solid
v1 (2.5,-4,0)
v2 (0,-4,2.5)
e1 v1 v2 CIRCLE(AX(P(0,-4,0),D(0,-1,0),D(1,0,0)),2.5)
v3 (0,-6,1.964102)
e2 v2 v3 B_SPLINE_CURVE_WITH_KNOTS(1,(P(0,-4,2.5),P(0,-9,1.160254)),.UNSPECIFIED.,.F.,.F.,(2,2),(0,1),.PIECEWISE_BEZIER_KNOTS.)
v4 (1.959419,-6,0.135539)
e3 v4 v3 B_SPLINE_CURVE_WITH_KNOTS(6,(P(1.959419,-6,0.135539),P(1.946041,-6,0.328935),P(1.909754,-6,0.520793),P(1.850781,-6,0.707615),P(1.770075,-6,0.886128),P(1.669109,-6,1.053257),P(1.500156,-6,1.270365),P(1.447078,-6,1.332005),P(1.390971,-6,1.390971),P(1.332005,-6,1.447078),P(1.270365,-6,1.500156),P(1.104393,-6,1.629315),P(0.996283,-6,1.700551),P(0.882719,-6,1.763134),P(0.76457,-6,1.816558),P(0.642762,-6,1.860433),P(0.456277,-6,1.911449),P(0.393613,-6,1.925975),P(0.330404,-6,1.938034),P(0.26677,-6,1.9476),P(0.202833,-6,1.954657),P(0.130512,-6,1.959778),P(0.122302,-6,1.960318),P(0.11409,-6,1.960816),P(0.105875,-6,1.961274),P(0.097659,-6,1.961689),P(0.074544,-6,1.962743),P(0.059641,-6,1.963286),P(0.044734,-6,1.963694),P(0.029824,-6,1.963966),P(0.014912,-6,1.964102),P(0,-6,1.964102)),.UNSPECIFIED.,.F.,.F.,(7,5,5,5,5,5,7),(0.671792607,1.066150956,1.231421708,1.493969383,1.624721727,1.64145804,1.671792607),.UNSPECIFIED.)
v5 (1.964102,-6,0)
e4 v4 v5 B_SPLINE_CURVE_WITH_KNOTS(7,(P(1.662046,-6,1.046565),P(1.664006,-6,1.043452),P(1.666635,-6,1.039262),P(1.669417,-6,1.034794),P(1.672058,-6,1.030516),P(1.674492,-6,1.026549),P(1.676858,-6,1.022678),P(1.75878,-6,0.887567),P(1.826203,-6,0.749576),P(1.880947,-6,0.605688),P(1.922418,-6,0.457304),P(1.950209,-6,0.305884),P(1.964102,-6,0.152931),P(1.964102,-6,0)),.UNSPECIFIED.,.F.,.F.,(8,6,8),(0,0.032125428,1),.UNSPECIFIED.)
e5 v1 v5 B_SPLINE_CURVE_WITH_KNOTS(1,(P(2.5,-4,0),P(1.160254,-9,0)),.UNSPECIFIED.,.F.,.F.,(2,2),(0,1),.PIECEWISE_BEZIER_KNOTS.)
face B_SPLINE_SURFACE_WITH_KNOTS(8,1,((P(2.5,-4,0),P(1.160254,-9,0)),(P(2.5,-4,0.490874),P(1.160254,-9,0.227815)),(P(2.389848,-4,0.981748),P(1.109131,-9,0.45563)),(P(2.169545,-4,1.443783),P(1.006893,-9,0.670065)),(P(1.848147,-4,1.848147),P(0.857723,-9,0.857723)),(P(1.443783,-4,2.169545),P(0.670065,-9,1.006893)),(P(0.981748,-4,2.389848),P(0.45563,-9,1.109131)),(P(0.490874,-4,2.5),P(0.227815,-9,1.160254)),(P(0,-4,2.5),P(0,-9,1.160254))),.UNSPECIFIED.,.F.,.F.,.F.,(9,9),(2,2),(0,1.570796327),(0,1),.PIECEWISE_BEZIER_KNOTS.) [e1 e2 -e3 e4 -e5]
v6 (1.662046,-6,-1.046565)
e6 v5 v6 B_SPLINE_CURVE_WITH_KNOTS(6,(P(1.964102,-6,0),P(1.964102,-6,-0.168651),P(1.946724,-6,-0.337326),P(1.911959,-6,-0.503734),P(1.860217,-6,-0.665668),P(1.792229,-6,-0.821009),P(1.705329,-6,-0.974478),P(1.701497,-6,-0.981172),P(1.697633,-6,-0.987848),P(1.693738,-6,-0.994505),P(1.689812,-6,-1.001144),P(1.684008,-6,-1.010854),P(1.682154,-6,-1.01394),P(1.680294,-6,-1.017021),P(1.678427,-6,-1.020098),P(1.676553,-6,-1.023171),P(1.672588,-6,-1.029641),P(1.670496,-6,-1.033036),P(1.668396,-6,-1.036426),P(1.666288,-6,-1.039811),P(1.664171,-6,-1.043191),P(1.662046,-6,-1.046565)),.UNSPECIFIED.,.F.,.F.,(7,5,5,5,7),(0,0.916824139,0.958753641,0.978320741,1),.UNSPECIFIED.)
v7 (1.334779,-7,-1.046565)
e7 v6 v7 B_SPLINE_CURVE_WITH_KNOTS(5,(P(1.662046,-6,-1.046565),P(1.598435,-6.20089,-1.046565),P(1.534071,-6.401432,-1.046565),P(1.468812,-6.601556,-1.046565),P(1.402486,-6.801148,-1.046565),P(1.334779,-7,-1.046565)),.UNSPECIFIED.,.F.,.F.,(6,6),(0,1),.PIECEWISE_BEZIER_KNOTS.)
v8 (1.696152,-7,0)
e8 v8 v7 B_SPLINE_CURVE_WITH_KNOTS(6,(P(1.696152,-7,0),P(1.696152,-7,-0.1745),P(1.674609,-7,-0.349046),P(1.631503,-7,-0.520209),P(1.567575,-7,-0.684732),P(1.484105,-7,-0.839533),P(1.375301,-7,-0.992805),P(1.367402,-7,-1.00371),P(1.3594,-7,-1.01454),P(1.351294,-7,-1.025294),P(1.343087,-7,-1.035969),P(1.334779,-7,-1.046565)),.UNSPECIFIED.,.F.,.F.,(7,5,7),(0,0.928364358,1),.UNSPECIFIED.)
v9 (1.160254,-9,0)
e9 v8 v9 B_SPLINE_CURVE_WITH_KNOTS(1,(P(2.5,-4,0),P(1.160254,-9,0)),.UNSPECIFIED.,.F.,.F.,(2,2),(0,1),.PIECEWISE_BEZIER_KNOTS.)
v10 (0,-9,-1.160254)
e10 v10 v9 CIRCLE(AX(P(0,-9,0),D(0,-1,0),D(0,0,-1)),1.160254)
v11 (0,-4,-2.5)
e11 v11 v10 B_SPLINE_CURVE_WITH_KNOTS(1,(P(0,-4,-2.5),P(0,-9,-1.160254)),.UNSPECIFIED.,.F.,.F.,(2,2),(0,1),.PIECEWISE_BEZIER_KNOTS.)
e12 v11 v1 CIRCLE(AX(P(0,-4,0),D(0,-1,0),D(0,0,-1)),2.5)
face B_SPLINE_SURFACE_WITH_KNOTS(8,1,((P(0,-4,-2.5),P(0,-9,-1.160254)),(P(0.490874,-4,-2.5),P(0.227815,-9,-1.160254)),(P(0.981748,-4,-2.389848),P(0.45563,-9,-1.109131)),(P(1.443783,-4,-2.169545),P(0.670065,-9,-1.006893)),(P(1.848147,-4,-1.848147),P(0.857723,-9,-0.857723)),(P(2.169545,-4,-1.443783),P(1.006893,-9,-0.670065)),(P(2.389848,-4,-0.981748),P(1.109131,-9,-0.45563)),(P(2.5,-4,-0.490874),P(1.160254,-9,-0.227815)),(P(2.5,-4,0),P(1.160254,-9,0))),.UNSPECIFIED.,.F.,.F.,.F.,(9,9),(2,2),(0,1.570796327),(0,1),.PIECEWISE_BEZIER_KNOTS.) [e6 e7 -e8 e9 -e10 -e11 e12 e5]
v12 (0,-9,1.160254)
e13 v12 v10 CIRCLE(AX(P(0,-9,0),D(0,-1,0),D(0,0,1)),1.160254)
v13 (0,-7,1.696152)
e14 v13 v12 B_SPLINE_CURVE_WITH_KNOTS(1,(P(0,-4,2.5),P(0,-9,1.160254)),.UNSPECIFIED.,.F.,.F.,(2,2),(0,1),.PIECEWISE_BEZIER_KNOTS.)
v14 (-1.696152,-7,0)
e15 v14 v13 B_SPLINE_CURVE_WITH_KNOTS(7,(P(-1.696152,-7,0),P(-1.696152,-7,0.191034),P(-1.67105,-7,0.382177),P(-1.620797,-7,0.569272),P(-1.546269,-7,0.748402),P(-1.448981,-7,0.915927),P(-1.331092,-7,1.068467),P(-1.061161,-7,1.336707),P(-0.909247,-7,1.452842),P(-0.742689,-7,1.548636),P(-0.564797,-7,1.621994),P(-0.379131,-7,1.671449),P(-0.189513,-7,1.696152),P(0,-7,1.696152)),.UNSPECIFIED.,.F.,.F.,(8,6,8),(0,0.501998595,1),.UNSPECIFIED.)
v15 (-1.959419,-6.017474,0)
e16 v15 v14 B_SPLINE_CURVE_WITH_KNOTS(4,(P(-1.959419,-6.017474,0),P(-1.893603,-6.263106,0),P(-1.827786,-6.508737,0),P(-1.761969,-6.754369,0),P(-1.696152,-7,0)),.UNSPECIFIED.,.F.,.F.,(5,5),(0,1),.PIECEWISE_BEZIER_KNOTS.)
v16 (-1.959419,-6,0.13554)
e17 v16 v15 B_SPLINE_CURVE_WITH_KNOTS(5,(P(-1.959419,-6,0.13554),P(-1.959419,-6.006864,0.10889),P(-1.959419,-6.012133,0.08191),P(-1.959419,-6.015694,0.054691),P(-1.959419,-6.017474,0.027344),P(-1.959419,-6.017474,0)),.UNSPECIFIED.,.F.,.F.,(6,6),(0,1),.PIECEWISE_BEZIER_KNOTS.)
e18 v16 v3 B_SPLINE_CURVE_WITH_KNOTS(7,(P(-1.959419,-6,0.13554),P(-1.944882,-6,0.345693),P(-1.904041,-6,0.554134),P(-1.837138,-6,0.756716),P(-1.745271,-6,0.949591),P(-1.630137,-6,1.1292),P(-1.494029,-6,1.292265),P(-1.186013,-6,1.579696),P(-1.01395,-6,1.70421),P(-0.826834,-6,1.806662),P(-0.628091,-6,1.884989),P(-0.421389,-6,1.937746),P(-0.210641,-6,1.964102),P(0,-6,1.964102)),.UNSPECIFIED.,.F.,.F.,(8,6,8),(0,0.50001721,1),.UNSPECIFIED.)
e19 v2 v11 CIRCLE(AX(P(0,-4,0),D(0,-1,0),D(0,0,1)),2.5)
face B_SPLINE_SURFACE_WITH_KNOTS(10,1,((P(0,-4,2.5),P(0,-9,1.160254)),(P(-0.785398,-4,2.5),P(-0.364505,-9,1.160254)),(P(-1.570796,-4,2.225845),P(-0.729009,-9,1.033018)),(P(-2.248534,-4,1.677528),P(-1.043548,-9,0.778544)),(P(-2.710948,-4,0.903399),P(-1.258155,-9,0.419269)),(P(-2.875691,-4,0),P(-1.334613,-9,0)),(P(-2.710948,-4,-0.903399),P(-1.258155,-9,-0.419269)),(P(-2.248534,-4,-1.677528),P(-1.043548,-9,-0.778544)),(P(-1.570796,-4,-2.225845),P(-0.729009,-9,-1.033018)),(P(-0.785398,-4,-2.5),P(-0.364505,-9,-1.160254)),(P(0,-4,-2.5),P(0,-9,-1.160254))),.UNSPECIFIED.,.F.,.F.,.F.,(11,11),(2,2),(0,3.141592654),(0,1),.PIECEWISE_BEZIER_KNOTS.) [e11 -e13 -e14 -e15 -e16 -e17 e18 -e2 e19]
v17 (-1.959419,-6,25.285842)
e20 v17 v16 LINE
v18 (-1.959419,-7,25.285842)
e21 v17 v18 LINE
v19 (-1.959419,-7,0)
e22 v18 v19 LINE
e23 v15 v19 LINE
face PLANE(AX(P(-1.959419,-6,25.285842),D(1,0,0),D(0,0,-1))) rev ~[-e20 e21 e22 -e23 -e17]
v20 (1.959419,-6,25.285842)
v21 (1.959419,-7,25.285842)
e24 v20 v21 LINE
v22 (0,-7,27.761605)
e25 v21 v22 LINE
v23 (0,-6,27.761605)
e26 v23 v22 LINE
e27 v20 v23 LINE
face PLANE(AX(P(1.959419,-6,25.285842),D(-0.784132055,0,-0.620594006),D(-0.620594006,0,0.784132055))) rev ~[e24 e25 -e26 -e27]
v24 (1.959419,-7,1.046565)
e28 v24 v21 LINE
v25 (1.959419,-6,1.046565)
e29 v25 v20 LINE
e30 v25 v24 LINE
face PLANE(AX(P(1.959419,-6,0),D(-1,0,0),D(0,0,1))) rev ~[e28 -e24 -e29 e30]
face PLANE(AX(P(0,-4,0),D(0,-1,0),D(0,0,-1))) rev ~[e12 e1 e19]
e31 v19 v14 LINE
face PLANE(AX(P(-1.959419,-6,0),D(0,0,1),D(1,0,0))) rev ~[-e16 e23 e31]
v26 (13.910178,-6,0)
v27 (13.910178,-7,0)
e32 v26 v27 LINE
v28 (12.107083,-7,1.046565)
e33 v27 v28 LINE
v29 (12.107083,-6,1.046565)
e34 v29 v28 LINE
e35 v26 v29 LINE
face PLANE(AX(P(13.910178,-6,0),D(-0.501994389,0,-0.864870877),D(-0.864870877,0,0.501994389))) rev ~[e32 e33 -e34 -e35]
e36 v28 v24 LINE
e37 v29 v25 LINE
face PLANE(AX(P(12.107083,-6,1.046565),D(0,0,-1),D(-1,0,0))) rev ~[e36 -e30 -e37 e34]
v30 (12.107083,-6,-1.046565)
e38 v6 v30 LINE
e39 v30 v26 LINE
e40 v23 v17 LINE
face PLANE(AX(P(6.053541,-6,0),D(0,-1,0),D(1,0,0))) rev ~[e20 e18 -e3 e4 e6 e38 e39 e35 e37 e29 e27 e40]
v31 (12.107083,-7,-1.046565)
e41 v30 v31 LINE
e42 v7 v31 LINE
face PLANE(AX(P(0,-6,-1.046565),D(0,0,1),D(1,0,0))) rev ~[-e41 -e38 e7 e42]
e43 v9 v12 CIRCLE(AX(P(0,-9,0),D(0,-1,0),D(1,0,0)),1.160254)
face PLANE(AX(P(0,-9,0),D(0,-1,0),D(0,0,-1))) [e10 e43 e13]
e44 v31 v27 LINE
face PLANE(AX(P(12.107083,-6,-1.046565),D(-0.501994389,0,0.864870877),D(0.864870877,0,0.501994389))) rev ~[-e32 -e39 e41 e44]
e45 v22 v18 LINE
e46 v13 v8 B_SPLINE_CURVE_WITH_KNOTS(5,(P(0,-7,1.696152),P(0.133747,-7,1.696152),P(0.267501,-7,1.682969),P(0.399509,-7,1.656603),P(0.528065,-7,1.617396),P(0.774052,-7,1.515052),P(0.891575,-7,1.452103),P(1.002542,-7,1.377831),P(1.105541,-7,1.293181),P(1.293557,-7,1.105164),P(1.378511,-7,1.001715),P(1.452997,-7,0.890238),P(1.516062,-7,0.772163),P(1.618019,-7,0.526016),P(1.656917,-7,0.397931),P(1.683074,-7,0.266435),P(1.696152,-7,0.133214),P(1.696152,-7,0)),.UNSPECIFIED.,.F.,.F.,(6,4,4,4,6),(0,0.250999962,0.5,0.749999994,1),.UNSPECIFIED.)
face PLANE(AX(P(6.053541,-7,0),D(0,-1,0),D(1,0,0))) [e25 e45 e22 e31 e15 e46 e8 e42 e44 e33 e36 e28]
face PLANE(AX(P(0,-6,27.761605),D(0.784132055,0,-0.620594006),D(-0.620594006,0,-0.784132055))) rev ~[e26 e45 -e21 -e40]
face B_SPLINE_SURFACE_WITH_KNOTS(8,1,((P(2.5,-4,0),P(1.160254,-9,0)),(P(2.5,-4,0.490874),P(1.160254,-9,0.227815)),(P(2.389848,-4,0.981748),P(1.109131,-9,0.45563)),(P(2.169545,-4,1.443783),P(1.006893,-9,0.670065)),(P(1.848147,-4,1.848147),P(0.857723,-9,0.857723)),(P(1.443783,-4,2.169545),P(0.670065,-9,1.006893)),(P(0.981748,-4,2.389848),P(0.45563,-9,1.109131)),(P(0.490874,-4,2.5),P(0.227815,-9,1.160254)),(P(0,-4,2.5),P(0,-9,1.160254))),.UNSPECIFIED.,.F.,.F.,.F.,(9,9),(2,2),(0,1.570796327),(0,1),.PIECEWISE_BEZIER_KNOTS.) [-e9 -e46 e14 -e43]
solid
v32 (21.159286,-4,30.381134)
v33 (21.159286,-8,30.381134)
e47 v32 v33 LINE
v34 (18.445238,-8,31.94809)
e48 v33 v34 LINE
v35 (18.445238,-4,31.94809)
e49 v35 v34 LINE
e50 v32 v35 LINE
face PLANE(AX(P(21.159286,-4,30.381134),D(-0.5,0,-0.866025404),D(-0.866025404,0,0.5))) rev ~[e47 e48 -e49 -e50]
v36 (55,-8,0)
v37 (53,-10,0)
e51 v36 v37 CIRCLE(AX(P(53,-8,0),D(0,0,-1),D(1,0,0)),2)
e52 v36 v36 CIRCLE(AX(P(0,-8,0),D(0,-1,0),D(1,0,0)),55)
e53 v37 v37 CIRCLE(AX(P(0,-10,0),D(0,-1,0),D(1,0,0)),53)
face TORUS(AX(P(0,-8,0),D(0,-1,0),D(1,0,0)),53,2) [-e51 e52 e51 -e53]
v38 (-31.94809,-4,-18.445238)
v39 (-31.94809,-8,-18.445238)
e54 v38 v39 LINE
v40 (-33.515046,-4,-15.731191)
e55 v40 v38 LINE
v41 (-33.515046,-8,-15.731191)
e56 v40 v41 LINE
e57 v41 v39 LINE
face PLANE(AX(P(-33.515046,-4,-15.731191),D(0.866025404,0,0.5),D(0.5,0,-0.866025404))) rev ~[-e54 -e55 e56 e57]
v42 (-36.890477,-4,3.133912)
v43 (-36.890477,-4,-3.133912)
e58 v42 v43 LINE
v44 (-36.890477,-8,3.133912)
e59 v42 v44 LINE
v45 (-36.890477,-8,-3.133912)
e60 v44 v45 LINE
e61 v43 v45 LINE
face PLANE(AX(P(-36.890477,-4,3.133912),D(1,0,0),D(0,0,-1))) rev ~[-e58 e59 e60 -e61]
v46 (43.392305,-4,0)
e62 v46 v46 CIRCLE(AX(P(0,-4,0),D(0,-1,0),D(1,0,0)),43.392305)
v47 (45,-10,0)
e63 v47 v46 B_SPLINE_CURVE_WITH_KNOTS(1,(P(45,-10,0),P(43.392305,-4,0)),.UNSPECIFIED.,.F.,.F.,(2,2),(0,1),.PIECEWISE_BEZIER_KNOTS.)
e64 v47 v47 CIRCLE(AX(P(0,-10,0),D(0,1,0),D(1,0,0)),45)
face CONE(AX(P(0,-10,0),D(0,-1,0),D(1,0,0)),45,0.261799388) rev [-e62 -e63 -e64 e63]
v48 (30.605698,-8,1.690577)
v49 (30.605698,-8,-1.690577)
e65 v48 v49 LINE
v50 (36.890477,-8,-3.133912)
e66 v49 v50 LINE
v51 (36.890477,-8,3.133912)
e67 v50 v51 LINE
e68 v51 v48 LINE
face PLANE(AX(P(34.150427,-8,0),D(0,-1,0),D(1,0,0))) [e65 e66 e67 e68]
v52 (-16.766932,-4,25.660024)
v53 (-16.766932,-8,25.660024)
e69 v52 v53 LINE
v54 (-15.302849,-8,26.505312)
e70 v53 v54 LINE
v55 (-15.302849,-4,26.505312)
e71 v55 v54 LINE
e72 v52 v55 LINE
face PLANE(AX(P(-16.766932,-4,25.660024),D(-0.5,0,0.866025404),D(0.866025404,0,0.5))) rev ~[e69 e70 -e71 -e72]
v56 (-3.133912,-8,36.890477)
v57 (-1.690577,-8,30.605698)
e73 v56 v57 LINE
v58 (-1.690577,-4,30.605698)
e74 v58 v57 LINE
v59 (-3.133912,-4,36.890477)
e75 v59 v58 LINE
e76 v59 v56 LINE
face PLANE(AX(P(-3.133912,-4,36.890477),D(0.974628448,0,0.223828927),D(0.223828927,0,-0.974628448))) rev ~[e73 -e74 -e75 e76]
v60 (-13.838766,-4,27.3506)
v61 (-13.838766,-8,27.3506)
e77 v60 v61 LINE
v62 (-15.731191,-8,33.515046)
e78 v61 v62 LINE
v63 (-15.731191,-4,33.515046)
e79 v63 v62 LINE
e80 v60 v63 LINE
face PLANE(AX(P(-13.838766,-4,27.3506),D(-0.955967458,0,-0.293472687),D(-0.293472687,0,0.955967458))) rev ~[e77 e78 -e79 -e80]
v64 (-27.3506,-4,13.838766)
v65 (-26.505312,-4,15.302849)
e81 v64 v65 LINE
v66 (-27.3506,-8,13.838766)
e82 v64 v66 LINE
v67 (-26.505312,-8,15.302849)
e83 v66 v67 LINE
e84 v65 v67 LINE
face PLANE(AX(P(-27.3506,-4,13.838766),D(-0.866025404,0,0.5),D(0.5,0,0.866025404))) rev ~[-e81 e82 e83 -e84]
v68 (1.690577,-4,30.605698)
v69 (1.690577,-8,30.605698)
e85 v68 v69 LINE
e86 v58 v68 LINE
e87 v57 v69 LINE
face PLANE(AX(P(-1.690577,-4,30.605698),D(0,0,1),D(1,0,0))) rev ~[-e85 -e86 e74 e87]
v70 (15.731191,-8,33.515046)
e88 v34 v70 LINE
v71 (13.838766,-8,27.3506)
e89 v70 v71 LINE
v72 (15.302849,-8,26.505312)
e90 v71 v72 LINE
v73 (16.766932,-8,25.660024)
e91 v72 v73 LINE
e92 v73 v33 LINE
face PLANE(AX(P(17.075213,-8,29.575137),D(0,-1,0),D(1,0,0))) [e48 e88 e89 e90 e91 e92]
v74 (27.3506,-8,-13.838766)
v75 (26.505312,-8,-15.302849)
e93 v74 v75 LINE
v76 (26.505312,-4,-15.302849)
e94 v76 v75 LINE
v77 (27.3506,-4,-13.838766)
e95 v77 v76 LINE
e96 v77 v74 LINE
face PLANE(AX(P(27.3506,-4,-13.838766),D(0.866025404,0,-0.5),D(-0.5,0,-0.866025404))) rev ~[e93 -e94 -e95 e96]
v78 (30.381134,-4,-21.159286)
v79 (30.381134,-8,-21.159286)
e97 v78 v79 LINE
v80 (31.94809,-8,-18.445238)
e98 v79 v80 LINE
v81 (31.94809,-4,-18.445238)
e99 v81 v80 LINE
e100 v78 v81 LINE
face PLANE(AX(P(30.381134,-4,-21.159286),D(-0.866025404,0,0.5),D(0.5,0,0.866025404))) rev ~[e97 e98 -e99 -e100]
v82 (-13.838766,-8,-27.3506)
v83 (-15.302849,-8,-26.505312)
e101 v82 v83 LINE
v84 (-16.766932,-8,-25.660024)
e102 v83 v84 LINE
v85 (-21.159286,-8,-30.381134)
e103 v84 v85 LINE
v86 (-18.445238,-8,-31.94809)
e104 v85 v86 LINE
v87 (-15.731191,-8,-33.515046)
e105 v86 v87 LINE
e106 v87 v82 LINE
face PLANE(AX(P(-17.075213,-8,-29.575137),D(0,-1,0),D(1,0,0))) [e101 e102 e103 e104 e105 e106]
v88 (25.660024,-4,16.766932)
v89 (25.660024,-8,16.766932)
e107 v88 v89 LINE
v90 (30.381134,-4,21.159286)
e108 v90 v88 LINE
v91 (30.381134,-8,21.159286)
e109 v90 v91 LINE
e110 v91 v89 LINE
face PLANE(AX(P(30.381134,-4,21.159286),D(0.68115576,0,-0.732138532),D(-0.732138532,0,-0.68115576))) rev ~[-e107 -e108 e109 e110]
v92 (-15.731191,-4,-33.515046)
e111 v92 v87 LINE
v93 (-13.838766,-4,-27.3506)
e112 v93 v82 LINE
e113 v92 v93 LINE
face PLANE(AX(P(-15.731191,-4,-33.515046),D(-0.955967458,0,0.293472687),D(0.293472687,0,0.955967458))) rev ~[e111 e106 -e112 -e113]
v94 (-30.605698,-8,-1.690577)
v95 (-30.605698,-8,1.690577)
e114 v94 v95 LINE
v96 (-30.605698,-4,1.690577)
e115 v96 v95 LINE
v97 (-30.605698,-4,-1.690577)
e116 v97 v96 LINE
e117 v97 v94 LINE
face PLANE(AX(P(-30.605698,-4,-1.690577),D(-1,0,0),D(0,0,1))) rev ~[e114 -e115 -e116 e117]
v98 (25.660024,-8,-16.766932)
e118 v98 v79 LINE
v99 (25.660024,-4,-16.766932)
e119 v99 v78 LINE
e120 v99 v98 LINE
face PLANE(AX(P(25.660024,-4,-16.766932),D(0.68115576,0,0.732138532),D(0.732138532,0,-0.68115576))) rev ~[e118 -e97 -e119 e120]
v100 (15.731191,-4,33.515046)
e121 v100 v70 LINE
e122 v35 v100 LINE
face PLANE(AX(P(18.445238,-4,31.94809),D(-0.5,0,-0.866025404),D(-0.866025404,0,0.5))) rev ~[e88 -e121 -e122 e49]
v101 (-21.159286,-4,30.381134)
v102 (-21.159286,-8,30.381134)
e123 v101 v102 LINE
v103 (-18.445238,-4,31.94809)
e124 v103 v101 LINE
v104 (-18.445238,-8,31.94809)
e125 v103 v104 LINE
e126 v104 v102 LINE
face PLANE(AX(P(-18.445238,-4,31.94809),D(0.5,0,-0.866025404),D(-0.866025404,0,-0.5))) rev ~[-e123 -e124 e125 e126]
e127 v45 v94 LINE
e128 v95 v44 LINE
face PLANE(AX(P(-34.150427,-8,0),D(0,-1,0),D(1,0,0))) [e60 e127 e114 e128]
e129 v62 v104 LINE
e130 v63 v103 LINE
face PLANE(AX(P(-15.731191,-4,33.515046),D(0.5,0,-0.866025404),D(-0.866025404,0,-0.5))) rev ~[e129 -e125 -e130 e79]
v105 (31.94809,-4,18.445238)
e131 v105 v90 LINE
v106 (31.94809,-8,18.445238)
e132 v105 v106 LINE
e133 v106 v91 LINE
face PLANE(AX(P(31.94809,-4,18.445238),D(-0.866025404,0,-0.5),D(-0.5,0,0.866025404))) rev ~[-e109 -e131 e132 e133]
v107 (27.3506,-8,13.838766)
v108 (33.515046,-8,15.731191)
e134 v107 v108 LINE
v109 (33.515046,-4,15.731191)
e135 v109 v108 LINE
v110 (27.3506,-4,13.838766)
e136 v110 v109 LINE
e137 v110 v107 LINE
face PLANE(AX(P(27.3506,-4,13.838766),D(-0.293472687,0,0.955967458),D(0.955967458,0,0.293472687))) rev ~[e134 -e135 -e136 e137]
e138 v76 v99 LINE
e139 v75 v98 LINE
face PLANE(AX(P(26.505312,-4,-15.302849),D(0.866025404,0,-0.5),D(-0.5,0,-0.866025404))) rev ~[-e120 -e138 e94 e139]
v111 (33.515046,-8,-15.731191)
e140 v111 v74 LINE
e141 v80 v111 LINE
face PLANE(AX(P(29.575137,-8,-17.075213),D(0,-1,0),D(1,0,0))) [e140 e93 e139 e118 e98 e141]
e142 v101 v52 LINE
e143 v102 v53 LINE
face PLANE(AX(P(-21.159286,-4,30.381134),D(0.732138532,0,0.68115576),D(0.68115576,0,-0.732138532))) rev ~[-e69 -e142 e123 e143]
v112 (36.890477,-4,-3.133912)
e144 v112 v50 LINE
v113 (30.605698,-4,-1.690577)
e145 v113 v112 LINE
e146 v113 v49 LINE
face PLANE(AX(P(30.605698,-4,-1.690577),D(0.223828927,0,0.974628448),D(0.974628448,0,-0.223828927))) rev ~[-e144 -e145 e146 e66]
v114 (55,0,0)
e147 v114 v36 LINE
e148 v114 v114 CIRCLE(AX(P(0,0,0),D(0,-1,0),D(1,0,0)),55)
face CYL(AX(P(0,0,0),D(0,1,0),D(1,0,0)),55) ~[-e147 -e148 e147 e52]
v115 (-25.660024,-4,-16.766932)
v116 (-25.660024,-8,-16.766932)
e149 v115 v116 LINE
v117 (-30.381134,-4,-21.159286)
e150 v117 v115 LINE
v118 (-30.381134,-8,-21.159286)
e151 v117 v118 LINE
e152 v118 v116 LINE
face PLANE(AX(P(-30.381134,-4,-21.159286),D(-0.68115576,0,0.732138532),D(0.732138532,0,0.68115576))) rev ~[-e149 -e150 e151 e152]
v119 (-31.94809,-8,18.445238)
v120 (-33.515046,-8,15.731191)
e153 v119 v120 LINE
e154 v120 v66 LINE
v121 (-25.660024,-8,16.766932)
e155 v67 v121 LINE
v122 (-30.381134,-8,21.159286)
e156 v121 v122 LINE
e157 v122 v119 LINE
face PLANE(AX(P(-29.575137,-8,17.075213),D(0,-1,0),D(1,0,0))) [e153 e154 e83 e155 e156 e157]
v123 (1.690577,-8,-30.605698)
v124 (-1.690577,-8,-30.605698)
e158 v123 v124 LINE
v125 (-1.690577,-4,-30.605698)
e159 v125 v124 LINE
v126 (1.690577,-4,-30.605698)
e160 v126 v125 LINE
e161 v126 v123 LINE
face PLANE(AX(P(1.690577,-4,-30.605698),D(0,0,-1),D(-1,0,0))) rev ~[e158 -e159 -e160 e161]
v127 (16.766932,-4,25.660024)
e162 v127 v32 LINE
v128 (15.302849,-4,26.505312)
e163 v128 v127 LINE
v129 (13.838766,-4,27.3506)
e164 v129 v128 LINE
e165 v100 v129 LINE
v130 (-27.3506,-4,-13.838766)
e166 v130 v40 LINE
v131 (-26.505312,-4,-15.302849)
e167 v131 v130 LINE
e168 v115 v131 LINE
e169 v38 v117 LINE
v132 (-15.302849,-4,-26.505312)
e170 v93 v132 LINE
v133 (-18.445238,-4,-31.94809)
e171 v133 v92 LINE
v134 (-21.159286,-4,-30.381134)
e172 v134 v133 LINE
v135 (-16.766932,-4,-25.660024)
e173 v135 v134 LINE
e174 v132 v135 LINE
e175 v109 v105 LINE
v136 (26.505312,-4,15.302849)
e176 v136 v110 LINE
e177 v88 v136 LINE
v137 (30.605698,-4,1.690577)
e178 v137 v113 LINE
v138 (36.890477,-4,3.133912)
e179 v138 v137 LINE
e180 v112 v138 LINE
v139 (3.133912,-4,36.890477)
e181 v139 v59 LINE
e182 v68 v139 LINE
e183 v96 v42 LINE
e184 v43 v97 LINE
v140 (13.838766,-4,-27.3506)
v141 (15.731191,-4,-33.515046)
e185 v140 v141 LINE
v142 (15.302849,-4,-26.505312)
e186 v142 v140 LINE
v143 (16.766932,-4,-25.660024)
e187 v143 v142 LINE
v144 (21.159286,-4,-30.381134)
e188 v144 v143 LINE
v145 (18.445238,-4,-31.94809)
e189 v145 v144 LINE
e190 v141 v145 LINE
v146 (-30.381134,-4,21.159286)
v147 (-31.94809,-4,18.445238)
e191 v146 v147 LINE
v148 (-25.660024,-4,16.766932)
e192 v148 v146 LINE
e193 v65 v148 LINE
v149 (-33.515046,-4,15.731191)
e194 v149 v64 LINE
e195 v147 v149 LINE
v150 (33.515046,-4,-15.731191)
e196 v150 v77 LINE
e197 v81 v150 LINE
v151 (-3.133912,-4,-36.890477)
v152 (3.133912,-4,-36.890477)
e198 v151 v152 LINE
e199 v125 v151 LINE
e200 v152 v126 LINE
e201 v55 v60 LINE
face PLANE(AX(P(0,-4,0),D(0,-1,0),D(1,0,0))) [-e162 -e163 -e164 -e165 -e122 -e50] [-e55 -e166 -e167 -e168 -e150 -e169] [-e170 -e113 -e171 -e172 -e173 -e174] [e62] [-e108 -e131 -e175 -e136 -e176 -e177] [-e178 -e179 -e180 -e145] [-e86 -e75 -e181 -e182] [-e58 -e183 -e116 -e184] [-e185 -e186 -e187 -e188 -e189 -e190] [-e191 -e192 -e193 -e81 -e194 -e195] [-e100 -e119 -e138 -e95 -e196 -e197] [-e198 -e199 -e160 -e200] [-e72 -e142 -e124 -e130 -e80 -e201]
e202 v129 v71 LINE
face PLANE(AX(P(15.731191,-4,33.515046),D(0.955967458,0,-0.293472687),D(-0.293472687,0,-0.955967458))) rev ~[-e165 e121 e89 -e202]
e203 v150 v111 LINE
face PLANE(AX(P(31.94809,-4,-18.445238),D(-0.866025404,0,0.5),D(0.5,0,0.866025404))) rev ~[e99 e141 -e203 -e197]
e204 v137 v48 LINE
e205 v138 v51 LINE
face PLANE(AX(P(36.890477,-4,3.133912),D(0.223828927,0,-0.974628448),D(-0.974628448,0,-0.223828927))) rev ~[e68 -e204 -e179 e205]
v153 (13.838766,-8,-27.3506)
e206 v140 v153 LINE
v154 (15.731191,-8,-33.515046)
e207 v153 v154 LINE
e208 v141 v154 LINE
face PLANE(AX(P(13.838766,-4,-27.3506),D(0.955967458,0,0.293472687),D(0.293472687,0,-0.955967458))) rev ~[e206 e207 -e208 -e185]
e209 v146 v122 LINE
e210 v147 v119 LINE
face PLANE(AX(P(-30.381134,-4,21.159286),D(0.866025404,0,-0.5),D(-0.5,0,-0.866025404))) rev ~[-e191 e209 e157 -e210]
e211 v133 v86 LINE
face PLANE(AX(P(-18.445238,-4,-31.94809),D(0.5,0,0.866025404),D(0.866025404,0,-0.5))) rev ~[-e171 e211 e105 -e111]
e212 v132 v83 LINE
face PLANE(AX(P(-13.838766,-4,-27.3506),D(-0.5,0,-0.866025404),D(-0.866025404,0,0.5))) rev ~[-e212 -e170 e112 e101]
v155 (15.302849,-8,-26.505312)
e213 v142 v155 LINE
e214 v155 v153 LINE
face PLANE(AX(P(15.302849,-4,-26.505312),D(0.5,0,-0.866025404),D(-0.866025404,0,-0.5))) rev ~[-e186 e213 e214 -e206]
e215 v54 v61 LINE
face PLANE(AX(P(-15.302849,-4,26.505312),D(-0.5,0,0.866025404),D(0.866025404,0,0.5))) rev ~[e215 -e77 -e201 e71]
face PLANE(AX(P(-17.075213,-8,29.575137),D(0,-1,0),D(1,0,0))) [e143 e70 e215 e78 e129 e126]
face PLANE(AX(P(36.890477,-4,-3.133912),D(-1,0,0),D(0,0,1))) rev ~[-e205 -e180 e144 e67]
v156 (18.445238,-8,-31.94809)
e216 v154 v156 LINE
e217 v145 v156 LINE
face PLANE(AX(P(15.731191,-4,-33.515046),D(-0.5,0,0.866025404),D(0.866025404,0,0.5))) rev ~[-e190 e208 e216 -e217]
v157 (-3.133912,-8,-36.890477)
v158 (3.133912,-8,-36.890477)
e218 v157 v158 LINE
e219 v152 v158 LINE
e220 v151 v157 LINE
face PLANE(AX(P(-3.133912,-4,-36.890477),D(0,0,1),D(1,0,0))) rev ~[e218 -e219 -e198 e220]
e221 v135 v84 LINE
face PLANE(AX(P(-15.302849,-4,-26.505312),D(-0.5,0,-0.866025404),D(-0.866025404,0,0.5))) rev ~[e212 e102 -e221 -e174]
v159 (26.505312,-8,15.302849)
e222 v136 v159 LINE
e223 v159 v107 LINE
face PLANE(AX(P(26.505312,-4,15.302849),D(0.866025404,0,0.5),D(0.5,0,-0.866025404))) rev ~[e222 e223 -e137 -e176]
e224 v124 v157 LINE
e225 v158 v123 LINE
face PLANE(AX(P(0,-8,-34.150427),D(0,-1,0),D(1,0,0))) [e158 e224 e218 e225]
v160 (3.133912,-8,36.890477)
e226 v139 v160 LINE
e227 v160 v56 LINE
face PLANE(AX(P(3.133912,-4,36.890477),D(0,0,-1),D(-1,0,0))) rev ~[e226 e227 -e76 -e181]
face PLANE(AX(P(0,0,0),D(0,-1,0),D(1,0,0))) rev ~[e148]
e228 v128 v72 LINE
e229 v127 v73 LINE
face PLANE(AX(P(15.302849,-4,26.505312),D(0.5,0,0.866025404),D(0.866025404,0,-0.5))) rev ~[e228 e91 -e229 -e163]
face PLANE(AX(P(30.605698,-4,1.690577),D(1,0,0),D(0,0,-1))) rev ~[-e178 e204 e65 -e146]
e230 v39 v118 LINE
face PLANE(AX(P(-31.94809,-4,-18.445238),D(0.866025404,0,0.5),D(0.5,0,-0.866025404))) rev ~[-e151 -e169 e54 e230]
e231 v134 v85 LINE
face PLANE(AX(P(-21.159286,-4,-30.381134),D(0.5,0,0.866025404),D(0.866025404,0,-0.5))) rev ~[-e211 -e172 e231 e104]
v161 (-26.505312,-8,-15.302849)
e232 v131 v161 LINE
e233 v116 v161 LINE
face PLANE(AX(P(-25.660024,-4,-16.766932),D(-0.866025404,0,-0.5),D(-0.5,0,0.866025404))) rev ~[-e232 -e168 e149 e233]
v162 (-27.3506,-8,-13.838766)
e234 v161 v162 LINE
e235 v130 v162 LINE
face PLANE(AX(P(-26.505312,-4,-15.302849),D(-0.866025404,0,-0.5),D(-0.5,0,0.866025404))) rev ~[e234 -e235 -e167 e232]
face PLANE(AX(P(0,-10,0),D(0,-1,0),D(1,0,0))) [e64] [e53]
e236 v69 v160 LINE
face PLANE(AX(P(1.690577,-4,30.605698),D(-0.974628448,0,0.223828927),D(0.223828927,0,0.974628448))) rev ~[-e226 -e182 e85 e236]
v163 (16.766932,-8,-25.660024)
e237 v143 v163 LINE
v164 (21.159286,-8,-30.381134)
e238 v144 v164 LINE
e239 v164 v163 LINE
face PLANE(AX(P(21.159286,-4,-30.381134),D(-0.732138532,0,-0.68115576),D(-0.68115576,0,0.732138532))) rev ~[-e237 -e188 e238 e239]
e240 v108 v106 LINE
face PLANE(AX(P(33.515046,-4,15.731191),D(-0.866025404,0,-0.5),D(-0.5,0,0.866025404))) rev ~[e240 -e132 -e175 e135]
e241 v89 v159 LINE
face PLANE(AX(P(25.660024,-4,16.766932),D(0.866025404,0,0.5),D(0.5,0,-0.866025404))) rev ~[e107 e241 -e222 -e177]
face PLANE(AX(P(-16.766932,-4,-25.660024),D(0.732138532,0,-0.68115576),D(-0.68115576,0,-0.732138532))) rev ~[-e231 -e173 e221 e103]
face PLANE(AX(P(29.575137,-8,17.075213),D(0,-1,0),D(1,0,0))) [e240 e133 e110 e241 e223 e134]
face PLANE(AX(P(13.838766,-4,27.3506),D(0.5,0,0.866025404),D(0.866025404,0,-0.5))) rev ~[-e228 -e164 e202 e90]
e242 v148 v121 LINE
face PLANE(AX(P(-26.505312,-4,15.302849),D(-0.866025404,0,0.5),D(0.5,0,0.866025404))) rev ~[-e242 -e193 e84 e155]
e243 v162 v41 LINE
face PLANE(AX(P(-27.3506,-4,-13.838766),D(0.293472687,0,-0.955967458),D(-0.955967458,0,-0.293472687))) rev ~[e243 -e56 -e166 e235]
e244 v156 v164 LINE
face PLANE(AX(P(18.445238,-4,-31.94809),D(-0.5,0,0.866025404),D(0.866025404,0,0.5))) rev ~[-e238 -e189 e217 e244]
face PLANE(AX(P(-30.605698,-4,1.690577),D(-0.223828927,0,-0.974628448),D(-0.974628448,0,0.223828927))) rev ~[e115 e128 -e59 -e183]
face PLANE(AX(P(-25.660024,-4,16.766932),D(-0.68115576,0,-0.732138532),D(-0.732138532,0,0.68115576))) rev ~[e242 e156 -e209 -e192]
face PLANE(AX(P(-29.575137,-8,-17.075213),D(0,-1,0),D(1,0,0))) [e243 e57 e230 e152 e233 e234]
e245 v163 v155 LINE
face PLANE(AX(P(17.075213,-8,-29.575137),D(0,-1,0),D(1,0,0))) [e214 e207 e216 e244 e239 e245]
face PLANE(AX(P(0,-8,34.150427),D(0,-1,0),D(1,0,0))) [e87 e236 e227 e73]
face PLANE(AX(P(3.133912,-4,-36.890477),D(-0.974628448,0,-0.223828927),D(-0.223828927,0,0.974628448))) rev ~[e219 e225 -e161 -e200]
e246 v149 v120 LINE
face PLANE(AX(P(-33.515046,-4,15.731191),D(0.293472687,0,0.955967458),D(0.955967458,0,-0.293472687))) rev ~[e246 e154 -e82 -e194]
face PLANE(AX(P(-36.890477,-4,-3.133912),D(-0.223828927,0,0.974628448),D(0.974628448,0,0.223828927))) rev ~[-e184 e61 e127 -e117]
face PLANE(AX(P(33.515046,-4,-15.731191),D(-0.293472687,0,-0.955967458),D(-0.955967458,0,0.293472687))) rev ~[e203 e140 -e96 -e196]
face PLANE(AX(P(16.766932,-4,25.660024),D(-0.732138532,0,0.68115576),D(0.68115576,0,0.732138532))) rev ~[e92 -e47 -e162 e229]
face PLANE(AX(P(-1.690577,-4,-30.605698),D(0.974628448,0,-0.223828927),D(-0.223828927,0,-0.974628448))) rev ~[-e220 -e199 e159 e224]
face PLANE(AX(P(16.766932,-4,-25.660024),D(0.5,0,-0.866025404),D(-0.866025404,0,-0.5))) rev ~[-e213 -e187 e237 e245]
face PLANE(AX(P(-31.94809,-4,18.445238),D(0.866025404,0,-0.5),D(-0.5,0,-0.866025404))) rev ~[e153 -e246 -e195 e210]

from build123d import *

# Parameters (mm, degrees)
F0_R      = 55
F1_DEPTH  = 10
F2_R      = 45
F3_DEPTH  = 6
F3_TAPER  = 15
F5_DEPTH  = 4
F11_DEPTH = 5
F11_TAPER = 15
F14_DEPTH = 1
F16_DEPTH = 1
F17_R     = 2


# Not quite as in the source:
# - the program builds the solid bodies; features that only make, move or delete a surface that nothing else refers to are left out


with BuildPart() as f1:
    # F0 (on Front) → F1 (new body)
    with BuildSketch(Plane.XZ):
        Circle(F0_R)
    extrude(amount=F1_DEPTH)

    # F2 (on face) → F3 (cut)
    with BuildSketch(Plane.XZ.offset(10)):
        Circle(F2_R)
    extrude(amount=-F3_DEPTH, taper=F3_TAPER, mode=Mode.SUBTRACT)

    # F4 (on face) → F5 (join)
    with BuildSketch(Plane.XZ.offset(4)):
        Polygon((0, 36.8904769421), (-3.1339118723, 36.8904769421), (-1.6905769007, 30.6056980044), (0, 30.6056980044), (1.6905769007, 30.6056980044), (3.1339118723, 36.8904769421), align=None)
        Polygon((18.445238471, 31.9480901896), (15.7311911764, 33.5150461257), (13.8387664591, 27.3506004227), (15.3028490022, 26.5053119723), (16.7669315453, 25.660023522), (21.1592857656, 30.3811342534), align=None)
        Polygon((31.9480901896, 18.445238471), (30.3811342534, 21.1592857656), (25.660023522, 16.7669315453), (26.5053119723, 15.3028490022), (27.3506004227, 13.8387664591), (33.5150461257, 15.7311911764), align=None)
        Polygon((36.8904769421, 0), (36.8904769421, 3.1339118723), (30.6056980044, 1.6905769007), (30.6056980044, 0), (30.6056980044, -1.6905769007), (36.8904769421, -3.1339118723), align=None)
        Polygon((31.9480901896, -18.445238471), (33.5150461257, -15.7311911764), (27.3506004227, -13.8387664591), (26.5053119723, -15.3028490022), (25.660023522, -16.7669315453), (30.3811342534, -21.1592857656), align=None)
        Polygon((18.445238471, -31.9480901896), (21.1592857656, -30.3811342534), (16.7669315453, -25.660023522), (15.3028490022, -26.5053119723), (13.8387664591, -27.3506004227), (15.7311911764, -33.5150461257), align=None)
        Polygon((0, -36.8904769421), (3.1339118723, -36.8904769421), (1.6905769007, -30.6056980044), (0, -30.6056980044), (-1.6905769007, -30.6056980044), (-3.1339118723, -36.8904769421), align=None)
        Polygon((-18.445238471, -31.9480901896), (-15.7311911764, -33.5150461257), (-13.8387664591, -27.3506004227), (-15.3028490022, -26.5053119723), (-16.7669315453, -25.660023522), (-21.1592857656, -30.3811342534), align=None)
        Polygon((-31.9480901896, -18.445238471), (-30.3811342534, -21.1592857656), (-25.660023522, -16.7669315453), (-26.5053119723, -15.3028490022), (-27.3506004227, -13.8387664591), (-33.5150461257, -15.7311911764), align=None)
        Polygon((-36.8904769421, 0), (-36.8904769421, -3.1339118723), (-30.6056980044, -1.6905769007), (-30.6056980044, 0), (-30.6056980044, 1.6905769007), (-36.8904769421, 3.1339118723), align=None)
        Polygon((-31.9480901896, 18.445238471), (-33.5150461257, 15.7311911764), (-27.3506004227, 13.8387664591), (-26.5053119723, 15.3028490022), (-25.660023522, 16.7669315453), (-30.3811342534, 21.1592857656), align=None)
        Polygon((-18.445238471, 31.9480901896), (-21.1592857656, 30.3811342534), (-16.7669315453, 25.660023522), (-15.3028490022, 26.5053119723), (-13.8387664591, 27.3506004227), (-15.7311911764, 33.5150461257), align=None)
    extrude(amount=F5_DEPTH)

    # F17
    f17_edges = [f1.edges().sort_by_distance(p)[0] for p in [
        (-55, -10, 0),
    ]]
    fillet(f17_edges, radius=F17_R)


with BuildPart() as f11:
    # F10 (on offset) → F11 (new body)
    with BuildSketch(Plane.XZ.offset(4)):
        with BuildLine():
            ThreePointArc((0, -2.5), (1.767766953, -1.767766953), (2.5, 0))
            ThreePointArc((2.5, 0), (1.767766953, 1.767766953), (0, 2.5))
            Line((0, 2.5), (0, -2.5))
        make_face()
        with BuildLine():
            Line((0, -2.5), (0, 2.5))
            ThreePointArc((0, 2.5), (-2.5, 0), (0, -2.5))
        make_face()
    extrude(amount=F11_DEPTH, taper=F11_TAPER)

    # F13 (on offset) → F14 (join)
    with BuildSketch(Plane.XZ.offset(6)):
        Polygon((0, 27.7616046369), (-1.9594193436, 25.2858418971), (0, 25.2858418971), (1.9594193436, 25.2858418971), align=None)
        Polygon((0, 25.2858418971), (-1.9594193436, 25.2858418971), (-1.9594193436, 0), (1.9594193436, 0), (1.9594193436, 25.2858418971), align=None)
    extrude(amount=F14_DEPTH)

    # F15 (on offset) → F16 (join)
    with BuildSketch(Plane.XZ.offset(6)):
        Polygon((12.1070826426, 0), (12.1070826426, 1.0465652449), (0, 1.0465652449), (0, -1.0465652449), (12.1070826426, -1.0465652449), align=None)
        Polygon((13.9101780951, 0), (12.1070826426, 1.0465652449), (12.1070826426, 0), (12.1070826426, -1.0465652449), align=None)
    extrude(amount=F16_DEPTH)


solid = Compound([f1.part, f11.part])
